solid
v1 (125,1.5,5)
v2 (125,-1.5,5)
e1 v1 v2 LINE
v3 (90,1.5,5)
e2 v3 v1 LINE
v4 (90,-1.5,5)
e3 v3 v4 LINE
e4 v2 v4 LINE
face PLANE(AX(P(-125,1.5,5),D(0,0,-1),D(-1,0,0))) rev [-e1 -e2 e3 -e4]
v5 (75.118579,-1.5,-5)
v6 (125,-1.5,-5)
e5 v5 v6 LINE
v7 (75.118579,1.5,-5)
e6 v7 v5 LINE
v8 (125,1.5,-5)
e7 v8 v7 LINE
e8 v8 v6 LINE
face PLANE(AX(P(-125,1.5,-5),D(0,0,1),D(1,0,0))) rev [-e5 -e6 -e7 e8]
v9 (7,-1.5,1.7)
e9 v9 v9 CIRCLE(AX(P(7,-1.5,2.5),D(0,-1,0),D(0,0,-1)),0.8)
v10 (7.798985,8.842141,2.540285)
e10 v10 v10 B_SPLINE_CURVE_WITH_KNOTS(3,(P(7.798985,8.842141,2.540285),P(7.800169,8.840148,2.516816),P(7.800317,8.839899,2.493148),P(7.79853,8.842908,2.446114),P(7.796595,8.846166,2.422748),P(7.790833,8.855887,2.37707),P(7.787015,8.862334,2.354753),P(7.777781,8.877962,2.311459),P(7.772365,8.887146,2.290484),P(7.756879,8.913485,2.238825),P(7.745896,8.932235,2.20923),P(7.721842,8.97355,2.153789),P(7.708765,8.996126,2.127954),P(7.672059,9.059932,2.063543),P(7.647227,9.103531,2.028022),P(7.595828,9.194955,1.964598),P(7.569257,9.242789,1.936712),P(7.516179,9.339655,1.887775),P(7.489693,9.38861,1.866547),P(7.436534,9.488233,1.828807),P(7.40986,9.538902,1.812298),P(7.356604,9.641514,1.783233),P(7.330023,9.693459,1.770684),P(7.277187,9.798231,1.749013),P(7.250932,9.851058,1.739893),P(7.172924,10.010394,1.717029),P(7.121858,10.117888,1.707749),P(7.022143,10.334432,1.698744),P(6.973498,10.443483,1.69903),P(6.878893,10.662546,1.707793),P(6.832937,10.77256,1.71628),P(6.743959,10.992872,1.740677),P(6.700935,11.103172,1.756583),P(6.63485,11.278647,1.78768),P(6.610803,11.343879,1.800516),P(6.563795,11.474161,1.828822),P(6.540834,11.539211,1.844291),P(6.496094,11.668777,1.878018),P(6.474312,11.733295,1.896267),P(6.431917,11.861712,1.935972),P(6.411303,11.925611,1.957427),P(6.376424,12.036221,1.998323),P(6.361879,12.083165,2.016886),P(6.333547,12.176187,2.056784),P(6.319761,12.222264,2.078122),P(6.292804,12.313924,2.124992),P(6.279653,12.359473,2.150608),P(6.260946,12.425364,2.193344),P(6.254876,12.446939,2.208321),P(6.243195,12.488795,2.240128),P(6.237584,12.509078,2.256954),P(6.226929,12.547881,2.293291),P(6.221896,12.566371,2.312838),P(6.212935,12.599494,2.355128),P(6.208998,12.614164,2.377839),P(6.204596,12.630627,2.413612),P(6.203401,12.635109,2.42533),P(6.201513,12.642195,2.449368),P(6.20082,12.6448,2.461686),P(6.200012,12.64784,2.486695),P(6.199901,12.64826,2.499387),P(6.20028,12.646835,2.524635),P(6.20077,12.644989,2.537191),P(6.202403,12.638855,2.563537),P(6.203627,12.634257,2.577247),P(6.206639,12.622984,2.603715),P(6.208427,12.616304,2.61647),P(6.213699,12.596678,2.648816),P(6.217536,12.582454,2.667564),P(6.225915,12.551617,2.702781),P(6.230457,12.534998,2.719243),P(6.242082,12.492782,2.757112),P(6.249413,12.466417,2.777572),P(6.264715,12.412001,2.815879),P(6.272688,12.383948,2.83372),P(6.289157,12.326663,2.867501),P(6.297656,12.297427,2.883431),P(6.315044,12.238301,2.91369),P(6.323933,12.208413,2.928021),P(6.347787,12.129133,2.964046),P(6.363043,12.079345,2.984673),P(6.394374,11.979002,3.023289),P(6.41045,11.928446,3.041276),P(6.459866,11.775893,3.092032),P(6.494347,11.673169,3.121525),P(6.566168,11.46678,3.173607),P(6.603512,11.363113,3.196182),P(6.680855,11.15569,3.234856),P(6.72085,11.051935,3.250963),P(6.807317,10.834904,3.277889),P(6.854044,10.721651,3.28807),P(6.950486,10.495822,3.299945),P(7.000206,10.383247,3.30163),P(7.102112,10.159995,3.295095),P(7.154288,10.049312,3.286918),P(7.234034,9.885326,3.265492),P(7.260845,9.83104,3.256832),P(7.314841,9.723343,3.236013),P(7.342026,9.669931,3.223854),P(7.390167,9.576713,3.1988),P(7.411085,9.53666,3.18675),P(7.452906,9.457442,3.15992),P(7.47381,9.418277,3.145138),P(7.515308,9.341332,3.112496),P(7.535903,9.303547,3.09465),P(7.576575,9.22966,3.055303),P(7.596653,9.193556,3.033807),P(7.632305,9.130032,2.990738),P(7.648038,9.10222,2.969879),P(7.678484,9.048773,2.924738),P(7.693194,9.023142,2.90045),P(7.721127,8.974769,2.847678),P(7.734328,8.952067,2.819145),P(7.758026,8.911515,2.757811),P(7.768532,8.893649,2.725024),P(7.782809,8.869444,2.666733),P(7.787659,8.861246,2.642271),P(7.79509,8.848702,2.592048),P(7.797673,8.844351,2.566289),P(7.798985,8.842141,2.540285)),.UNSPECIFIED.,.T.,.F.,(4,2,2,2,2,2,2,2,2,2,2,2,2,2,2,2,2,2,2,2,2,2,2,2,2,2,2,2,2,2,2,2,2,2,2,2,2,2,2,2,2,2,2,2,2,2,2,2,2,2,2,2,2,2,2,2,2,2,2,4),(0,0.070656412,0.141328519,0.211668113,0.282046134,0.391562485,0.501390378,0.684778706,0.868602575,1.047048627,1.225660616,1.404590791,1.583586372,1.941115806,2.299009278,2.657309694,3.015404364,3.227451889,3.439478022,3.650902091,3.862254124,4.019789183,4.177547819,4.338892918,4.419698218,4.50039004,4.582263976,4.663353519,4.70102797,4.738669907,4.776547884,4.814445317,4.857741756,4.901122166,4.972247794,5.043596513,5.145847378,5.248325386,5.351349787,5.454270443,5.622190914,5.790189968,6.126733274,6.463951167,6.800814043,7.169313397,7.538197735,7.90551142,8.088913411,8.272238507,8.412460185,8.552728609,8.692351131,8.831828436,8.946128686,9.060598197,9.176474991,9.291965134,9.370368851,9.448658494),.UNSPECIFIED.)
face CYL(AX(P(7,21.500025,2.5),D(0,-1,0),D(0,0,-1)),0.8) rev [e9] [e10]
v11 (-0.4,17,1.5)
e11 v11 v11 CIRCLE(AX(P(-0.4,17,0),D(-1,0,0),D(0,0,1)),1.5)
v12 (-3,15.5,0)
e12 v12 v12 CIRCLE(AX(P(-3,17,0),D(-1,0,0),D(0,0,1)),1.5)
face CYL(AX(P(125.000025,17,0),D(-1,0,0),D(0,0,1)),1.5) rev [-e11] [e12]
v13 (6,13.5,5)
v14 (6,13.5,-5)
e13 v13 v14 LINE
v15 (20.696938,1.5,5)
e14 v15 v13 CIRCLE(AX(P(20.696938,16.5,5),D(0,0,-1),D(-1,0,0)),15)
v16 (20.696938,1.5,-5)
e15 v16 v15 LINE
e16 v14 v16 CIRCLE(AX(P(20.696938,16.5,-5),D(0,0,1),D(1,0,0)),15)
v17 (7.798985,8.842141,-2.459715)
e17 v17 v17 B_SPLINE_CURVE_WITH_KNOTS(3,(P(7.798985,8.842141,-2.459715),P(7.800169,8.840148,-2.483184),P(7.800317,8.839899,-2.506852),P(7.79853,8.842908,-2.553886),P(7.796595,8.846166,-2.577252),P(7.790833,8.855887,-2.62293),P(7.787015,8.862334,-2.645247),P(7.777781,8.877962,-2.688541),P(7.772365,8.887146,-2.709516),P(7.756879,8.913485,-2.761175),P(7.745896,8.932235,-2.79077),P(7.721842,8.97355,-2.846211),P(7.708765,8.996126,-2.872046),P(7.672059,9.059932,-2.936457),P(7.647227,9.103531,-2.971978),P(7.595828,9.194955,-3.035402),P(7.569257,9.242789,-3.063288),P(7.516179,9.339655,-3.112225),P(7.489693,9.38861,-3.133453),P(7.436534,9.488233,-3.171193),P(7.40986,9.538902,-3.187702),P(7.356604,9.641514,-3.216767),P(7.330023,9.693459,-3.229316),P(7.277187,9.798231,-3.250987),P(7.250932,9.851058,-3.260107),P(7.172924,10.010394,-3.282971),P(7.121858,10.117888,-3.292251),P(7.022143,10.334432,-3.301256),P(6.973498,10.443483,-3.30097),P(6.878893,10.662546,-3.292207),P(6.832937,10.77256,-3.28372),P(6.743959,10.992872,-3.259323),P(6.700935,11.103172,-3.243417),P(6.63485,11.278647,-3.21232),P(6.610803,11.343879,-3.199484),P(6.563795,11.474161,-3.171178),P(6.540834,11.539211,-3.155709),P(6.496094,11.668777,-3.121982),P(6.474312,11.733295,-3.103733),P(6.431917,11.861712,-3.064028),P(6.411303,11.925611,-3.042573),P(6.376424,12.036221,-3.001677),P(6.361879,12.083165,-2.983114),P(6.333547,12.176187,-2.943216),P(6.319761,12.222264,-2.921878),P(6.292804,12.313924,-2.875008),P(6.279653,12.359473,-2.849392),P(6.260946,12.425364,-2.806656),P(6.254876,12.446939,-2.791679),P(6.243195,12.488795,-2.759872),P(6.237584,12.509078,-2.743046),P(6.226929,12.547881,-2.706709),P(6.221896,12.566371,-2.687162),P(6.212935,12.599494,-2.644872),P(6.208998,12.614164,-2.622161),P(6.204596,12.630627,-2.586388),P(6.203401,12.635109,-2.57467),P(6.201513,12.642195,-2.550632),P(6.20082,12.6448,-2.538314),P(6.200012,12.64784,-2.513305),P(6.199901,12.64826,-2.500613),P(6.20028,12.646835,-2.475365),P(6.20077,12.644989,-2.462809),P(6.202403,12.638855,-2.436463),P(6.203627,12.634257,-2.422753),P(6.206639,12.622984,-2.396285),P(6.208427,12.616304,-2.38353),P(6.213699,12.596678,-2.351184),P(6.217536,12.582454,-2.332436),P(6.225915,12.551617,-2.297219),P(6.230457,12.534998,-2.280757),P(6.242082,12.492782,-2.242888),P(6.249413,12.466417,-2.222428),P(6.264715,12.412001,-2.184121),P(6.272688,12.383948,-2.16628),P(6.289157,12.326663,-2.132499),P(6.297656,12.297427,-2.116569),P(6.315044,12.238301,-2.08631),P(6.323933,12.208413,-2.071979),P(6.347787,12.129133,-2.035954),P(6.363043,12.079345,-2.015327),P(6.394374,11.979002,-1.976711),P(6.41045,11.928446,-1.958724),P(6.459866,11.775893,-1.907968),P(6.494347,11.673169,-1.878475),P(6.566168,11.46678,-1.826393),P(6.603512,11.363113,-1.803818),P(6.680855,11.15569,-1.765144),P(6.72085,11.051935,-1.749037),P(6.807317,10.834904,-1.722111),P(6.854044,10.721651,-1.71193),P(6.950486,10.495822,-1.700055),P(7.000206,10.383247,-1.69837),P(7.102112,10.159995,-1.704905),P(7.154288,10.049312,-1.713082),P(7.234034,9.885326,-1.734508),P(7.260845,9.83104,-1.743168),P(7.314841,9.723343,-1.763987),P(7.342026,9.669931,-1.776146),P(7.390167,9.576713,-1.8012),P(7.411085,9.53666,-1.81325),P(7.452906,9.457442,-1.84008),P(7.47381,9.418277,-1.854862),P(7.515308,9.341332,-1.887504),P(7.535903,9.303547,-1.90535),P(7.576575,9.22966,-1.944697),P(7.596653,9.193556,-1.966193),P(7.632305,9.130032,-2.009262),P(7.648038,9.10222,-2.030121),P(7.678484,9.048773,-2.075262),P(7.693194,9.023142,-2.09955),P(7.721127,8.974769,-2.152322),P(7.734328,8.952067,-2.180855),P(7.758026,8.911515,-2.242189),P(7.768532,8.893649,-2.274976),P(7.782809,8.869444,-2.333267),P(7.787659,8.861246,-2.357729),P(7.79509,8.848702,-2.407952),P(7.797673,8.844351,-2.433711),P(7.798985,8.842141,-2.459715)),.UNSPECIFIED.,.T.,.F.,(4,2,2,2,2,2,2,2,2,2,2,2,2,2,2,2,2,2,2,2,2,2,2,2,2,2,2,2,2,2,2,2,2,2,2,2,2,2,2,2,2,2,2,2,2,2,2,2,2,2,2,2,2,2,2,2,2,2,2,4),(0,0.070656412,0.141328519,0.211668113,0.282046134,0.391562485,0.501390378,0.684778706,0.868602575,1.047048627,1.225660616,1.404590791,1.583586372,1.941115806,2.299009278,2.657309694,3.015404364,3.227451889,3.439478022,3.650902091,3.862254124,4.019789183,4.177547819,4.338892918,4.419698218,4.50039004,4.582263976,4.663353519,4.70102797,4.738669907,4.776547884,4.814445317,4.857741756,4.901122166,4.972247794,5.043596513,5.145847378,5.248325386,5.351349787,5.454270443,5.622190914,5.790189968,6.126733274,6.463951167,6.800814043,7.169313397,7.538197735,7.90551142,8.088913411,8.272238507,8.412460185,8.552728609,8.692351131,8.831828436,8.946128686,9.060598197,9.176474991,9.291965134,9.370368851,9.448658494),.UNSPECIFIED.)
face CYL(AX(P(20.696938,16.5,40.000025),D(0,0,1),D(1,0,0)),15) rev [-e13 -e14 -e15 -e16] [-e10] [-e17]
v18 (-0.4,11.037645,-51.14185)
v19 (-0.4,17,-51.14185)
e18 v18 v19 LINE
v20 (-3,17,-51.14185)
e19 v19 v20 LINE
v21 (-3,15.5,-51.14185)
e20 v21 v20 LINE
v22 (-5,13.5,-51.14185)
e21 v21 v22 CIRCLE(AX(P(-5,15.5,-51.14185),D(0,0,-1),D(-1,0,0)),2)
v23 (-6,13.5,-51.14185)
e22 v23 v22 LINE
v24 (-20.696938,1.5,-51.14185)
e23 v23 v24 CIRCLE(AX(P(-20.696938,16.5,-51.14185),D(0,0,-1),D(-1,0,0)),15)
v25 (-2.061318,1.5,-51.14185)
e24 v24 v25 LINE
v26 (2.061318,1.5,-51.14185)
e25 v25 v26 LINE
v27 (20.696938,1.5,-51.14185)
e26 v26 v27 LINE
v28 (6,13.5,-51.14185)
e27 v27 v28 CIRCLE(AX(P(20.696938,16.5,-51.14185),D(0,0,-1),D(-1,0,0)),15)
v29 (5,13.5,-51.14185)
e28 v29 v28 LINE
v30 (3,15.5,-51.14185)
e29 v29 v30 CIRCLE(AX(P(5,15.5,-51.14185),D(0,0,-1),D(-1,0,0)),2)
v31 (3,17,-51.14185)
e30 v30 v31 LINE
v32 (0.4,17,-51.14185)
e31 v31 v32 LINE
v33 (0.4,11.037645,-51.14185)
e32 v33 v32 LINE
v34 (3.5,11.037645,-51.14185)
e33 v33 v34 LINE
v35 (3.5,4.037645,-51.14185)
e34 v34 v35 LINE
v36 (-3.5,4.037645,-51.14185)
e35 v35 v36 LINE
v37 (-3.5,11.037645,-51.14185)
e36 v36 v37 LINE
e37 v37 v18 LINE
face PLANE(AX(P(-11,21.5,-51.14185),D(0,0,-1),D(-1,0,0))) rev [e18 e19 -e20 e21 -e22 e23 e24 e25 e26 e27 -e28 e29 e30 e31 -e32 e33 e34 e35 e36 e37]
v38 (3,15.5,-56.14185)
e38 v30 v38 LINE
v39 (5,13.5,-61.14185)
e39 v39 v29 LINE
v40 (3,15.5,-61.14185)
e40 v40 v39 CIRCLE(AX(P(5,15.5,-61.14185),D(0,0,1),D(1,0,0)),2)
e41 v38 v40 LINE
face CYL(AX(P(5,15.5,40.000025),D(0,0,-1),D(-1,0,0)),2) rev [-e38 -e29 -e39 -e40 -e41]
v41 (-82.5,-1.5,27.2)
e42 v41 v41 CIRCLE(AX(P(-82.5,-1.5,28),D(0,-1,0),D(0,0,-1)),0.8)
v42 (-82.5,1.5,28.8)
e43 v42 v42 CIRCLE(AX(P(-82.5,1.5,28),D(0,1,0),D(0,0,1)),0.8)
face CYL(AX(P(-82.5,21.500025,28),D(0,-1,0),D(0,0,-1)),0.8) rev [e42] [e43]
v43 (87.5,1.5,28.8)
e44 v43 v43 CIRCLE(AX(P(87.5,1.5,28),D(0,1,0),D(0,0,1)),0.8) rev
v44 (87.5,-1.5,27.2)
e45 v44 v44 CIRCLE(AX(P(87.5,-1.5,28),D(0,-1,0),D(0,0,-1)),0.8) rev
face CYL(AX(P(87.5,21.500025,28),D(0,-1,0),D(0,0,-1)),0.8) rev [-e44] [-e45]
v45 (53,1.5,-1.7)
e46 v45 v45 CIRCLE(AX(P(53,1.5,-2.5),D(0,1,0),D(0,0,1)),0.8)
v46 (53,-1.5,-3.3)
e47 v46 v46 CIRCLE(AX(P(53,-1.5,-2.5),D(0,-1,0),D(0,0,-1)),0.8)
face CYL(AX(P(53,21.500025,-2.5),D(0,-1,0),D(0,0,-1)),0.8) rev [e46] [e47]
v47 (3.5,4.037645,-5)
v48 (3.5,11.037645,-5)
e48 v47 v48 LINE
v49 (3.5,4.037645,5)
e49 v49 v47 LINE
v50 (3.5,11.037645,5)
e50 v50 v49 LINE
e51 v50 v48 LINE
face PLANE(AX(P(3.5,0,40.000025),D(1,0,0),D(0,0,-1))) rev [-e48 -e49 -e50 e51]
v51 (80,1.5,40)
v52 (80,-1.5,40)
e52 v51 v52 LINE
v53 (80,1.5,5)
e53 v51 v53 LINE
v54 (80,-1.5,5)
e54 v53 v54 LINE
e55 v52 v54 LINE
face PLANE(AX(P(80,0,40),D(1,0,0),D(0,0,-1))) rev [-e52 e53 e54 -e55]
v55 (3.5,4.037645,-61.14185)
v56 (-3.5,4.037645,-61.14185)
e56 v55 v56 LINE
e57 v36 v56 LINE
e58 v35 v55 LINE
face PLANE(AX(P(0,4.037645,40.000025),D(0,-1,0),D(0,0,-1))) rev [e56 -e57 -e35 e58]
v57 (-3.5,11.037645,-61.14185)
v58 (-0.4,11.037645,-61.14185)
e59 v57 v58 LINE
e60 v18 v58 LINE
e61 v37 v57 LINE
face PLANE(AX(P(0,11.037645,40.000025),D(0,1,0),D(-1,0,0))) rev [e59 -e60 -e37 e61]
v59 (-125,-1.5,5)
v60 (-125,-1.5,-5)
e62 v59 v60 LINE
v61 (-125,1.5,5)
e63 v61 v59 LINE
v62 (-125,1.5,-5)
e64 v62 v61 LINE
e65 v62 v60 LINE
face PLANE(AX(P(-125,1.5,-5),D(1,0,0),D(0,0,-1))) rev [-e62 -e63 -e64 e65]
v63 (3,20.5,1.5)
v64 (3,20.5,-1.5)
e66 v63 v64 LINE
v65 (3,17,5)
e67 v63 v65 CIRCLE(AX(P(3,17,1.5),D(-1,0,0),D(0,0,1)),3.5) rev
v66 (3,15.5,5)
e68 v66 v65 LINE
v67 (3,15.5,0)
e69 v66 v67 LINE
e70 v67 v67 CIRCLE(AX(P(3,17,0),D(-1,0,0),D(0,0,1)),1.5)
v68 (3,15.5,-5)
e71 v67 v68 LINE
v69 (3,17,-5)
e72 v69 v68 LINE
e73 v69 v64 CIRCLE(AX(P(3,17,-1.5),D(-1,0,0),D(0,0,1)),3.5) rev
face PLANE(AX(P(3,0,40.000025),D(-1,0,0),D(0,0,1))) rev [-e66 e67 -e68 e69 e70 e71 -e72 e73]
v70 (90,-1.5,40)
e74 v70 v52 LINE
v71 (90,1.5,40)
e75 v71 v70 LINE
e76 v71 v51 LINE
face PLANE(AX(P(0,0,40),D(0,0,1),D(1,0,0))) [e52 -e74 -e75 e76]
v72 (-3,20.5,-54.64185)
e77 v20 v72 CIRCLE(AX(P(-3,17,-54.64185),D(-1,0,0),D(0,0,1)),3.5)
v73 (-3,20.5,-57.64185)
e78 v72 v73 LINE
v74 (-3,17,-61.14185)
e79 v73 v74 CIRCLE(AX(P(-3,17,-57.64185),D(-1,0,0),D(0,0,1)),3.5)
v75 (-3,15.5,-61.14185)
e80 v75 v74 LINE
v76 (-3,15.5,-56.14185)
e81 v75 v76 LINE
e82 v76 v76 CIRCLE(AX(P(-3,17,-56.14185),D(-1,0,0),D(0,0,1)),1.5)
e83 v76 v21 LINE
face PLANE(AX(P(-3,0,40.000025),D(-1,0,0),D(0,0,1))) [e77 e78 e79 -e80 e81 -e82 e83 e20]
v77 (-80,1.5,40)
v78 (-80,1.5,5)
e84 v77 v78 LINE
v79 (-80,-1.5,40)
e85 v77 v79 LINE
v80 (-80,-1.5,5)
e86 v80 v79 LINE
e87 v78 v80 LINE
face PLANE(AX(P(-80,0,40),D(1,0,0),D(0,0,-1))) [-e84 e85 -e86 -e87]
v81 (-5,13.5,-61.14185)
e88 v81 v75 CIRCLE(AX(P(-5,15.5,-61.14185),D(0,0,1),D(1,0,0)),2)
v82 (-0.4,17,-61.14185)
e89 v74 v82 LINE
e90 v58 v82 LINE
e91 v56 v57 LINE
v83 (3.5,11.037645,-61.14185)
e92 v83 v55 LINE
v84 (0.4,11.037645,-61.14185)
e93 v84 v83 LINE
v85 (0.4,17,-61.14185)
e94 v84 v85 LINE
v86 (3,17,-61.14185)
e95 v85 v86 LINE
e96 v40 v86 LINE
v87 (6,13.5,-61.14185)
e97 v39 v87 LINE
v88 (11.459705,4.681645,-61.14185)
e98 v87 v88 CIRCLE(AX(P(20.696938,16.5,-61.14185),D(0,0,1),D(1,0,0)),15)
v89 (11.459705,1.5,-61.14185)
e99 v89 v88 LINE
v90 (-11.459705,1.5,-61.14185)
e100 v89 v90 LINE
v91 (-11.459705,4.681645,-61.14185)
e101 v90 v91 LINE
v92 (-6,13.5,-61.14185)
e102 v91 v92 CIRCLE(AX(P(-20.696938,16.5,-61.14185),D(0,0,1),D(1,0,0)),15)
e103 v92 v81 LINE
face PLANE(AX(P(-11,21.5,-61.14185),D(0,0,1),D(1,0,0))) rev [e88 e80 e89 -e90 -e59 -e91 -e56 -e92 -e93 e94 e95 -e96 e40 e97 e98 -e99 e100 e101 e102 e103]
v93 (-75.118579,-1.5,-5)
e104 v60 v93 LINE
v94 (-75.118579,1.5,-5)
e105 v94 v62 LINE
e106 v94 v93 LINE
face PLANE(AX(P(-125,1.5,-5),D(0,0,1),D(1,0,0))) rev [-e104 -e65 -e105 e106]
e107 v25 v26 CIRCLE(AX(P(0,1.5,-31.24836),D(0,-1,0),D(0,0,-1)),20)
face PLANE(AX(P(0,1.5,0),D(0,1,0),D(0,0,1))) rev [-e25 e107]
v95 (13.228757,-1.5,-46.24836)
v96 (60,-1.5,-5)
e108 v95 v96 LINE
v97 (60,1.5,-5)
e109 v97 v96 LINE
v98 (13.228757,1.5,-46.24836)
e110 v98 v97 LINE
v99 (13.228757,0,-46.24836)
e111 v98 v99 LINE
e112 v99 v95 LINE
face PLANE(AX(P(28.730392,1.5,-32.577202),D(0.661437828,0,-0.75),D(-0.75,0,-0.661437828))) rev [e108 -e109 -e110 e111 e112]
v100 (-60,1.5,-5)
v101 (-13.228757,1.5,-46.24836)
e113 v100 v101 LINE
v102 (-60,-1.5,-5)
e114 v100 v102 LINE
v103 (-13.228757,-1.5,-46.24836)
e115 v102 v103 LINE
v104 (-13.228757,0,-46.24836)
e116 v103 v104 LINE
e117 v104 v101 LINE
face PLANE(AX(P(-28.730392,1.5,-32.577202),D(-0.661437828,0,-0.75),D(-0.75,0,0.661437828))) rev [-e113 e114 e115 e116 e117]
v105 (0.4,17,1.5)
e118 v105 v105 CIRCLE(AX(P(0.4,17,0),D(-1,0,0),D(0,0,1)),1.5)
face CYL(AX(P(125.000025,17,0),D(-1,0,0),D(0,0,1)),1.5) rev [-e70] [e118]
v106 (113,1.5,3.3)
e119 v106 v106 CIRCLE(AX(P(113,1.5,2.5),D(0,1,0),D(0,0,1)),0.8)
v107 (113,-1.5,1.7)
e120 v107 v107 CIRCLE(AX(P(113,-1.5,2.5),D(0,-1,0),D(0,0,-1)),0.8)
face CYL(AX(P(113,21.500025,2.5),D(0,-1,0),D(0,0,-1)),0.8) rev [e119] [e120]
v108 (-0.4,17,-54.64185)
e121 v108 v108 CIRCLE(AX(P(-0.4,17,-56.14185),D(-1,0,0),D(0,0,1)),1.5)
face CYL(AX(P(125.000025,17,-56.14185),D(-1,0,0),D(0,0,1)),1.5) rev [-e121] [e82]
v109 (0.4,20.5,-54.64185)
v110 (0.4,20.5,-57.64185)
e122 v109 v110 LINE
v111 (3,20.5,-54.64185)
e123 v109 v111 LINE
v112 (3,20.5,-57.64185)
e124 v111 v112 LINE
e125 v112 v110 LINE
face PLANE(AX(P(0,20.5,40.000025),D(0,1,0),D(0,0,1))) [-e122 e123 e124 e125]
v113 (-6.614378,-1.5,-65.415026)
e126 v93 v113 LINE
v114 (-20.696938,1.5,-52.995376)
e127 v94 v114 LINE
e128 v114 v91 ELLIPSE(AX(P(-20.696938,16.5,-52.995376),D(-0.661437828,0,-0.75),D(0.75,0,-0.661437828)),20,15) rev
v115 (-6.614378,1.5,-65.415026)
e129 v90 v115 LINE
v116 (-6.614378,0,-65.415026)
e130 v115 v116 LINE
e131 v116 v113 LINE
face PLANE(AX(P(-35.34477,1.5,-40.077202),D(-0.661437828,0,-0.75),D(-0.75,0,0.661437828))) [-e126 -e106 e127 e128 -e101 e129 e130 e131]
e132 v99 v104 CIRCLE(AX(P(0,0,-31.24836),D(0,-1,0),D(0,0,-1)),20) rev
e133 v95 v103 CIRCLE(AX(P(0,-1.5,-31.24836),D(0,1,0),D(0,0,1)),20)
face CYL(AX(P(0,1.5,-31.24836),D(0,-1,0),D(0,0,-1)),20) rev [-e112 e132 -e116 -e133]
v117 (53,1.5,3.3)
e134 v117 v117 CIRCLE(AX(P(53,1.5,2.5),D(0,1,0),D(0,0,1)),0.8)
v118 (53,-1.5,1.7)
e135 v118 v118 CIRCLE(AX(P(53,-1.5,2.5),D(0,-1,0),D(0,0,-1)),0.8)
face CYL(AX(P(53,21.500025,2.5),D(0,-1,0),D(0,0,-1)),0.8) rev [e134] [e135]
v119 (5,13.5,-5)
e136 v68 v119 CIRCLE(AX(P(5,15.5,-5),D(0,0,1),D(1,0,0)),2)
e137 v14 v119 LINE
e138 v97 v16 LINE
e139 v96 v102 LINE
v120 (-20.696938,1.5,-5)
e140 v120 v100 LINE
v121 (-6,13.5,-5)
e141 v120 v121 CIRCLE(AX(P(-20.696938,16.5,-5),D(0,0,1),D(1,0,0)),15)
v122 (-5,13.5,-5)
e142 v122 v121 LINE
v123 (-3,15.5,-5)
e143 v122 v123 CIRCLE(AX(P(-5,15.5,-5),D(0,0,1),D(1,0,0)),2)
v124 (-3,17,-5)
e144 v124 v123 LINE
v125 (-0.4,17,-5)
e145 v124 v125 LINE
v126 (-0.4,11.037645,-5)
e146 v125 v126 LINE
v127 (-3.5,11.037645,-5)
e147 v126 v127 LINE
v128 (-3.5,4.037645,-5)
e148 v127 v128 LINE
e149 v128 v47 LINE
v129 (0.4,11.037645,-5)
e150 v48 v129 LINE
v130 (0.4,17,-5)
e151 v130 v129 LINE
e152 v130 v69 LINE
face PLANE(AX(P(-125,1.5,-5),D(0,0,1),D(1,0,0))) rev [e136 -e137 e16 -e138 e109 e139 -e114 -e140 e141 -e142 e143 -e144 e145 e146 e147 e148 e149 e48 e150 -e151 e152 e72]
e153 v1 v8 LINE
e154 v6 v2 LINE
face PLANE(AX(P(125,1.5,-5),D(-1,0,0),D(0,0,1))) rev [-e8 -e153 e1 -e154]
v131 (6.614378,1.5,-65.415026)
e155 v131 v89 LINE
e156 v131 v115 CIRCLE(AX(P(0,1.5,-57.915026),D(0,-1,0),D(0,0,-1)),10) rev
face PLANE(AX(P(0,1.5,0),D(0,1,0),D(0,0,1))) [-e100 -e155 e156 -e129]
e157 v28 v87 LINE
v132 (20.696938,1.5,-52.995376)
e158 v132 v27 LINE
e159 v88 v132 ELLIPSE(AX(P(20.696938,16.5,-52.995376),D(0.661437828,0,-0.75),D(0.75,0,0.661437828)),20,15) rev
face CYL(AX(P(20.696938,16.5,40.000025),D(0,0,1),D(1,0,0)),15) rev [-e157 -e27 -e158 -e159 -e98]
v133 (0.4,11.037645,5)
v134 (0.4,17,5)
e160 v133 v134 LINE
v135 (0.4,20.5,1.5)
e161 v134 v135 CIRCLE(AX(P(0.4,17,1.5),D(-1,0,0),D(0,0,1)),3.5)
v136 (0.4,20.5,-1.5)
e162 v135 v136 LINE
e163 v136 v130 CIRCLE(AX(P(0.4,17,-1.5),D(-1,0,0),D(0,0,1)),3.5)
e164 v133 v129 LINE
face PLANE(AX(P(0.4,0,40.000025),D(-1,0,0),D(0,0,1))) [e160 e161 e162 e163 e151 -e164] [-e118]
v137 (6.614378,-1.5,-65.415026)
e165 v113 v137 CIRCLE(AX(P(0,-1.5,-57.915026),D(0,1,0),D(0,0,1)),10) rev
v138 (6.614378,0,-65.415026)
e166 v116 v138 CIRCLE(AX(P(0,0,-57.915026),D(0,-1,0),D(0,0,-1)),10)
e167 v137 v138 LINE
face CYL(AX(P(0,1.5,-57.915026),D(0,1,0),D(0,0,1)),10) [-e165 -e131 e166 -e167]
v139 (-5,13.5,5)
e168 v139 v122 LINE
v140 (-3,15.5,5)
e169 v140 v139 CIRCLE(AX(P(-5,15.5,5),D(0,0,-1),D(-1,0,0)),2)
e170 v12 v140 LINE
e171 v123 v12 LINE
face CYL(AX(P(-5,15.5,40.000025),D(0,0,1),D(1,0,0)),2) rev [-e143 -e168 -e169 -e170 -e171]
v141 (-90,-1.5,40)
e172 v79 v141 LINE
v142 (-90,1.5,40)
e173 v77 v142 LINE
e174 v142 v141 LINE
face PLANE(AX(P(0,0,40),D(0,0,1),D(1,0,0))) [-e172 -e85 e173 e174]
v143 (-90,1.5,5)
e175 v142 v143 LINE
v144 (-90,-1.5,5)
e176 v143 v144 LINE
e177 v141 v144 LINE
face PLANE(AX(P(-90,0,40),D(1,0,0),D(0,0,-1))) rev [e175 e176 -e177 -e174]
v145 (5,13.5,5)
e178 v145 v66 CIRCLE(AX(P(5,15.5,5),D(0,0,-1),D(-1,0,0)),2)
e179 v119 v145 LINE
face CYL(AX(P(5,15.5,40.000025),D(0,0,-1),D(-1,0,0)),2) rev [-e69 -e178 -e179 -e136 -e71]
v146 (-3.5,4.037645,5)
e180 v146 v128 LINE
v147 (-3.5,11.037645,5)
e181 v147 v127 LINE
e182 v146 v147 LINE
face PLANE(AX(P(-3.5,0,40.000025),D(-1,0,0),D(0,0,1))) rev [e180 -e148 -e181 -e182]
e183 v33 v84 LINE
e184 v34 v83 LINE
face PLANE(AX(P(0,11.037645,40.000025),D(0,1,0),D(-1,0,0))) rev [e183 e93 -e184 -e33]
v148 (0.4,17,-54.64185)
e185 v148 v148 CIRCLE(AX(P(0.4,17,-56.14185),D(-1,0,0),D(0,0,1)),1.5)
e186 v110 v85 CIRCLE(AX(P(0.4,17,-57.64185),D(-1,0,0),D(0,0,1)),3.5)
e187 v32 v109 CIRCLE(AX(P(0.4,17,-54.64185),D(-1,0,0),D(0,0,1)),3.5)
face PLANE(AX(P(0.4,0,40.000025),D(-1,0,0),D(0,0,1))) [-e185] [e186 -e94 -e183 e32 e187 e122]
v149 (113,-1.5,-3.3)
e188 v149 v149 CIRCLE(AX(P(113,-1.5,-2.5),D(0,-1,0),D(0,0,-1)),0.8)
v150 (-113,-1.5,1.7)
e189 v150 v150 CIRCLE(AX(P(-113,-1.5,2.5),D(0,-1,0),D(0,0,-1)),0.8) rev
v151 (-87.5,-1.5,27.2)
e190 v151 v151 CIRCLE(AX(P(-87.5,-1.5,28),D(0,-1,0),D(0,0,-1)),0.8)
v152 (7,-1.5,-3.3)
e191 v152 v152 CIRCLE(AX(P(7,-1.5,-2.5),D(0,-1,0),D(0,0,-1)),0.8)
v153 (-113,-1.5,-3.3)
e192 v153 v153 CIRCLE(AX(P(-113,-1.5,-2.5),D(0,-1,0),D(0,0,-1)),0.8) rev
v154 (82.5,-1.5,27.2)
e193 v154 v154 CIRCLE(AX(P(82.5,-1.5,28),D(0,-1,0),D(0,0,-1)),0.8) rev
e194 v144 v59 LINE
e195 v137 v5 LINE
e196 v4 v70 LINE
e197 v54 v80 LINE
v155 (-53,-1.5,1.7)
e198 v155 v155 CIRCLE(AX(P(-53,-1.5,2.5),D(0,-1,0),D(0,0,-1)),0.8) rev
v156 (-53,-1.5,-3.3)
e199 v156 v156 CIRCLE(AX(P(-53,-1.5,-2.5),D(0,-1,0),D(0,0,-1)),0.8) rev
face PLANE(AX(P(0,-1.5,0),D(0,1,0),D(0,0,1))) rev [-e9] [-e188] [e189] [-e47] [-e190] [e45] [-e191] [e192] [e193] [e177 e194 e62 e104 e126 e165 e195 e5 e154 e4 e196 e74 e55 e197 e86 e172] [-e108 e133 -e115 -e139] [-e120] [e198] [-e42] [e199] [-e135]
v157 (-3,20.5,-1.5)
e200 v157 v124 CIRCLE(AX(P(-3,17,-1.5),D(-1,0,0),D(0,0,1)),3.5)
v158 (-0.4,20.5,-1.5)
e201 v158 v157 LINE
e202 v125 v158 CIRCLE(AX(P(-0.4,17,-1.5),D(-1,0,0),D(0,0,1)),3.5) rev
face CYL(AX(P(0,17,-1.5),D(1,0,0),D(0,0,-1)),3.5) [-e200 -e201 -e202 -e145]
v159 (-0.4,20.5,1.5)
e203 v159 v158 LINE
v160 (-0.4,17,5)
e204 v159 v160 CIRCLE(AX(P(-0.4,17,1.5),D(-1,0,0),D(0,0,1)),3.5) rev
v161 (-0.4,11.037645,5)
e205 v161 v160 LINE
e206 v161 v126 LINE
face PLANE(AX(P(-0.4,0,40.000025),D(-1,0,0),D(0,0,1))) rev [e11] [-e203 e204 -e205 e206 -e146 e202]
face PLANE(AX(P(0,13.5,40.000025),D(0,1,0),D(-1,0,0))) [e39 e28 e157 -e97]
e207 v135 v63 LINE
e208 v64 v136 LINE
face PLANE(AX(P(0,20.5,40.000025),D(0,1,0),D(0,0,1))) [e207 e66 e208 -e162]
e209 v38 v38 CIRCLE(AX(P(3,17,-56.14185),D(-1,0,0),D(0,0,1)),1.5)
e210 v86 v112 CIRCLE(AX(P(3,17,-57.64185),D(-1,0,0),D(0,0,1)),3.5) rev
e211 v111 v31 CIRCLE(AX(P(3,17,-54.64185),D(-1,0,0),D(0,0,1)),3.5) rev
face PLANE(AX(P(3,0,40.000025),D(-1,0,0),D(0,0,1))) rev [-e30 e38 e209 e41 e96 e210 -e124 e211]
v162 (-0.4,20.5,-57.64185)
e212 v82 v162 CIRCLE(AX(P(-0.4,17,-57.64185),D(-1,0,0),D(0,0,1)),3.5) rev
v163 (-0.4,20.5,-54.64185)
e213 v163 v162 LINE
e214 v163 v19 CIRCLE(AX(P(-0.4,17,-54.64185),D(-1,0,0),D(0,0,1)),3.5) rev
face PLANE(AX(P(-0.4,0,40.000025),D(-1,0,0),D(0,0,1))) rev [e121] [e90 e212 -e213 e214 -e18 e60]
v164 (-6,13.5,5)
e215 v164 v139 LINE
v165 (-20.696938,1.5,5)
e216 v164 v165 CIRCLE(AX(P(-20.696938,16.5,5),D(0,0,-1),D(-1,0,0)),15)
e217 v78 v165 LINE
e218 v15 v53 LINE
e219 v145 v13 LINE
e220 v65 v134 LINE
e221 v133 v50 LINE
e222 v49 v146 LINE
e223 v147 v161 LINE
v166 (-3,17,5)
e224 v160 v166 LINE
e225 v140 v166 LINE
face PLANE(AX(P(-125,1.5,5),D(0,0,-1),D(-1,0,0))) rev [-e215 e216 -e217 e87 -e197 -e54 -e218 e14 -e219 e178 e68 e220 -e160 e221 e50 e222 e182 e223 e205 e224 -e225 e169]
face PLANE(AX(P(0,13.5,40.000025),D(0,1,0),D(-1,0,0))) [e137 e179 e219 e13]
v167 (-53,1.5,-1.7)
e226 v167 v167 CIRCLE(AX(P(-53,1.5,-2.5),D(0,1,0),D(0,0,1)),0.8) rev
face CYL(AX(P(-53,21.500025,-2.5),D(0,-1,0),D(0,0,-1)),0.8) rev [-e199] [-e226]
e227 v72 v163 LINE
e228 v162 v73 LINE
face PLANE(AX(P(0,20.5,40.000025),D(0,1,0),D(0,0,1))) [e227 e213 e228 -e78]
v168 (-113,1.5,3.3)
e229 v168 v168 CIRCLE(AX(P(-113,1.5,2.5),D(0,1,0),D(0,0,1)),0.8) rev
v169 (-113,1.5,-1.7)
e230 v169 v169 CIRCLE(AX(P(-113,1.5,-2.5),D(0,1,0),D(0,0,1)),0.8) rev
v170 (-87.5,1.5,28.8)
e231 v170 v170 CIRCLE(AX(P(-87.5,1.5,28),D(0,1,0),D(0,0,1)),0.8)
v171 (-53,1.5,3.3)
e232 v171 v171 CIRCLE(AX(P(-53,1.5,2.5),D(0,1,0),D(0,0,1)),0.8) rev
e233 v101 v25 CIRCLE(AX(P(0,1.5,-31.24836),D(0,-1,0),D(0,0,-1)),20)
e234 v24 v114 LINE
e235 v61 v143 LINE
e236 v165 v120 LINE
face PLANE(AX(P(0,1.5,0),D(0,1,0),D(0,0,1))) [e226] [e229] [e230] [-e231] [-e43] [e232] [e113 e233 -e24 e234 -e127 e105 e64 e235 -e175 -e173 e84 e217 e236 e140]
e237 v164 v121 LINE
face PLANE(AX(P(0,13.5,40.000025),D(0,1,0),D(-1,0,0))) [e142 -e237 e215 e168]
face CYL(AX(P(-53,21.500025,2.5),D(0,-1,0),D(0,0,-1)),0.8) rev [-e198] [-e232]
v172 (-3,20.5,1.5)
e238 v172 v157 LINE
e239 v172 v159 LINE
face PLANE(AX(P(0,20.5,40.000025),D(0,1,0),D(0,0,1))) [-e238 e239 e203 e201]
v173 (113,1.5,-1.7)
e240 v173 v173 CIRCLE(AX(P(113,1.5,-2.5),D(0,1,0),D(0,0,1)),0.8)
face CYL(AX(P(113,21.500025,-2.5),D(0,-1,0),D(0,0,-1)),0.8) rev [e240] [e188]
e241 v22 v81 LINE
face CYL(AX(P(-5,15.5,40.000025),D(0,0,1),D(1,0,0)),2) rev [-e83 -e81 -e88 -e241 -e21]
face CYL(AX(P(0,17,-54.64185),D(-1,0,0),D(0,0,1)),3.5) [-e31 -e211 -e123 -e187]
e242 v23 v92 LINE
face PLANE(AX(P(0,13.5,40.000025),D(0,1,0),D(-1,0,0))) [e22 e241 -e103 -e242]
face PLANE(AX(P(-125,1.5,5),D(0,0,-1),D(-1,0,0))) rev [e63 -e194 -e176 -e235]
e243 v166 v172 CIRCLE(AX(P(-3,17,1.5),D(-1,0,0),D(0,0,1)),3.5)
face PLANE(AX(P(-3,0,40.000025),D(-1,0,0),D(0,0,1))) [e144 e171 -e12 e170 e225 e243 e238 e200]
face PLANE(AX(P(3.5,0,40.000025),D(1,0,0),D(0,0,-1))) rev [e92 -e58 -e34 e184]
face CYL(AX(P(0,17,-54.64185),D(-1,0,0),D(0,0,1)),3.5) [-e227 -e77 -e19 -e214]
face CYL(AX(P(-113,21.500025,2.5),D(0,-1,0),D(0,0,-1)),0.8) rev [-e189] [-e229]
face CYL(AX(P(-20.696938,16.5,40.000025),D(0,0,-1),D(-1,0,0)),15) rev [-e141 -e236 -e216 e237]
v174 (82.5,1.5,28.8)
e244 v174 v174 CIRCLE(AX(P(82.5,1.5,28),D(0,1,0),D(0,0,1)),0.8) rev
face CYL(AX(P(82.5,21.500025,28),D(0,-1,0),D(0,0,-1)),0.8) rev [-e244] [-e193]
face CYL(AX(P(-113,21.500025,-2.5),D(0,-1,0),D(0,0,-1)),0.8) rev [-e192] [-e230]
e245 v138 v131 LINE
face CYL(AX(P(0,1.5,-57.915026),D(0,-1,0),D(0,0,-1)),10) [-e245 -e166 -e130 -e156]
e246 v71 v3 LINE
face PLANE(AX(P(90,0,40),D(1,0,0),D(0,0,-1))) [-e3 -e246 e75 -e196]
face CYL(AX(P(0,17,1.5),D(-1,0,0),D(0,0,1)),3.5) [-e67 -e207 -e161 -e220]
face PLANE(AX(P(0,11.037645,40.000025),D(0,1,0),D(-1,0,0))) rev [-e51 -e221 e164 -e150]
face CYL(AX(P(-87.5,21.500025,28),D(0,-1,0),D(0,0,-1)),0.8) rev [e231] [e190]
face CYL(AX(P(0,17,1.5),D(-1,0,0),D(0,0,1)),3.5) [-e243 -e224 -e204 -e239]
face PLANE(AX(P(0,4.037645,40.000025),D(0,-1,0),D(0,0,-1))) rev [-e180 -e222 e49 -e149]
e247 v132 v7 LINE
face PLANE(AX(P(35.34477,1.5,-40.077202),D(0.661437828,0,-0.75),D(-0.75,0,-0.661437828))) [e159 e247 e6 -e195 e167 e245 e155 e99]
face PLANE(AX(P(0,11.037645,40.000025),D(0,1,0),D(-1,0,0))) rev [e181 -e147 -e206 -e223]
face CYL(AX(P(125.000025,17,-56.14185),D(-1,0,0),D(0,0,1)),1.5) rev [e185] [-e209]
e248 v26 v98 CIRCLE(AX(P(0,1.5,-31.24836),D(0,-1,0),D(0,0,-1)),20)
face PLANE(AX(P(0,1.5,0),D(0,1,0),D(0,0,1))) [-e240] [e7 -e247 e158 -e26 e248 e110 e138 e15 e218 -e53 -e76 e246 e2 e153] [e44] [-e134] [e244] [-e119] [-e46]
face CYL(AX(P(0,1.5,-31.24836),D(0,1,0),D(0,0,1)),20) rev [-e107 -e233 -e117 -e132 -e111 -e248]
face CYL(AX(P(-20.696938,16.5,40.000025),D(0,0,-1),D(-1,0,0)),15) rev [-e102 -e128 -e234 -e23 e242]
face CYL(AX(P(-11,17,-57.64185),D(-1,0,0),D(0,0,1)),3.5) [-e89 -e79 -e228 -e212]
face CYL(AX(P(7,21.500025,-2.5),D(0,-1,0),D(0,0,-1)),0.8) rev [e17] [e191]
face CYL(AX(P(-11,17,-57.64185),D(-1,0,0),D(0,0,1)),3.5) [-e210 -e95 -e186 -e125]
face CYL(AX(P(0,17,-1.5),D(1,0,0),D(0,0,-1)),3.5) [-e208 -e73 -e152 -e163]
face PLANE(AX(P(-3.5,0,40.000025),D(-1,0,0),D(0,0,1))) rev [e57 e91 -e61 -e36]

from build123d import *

# Parameters (mm, degrees)
EXTRUDE_1_DEPTH      = 1.5
EXTRUDE_10_DEPTH     = 1.5
FILLET_1_R           = 10
FILLET_2_R           = 20
EXTRUDE_11_DEPTH     = 20
EXTRUDE_13_DEPTH     = 35
EXTRUDE_14_DEPTH     = 35
EXTRUDE_15_DEPTH     = 1.5
FILLET_5_R           = 20
FILLET_6_R           = 10
SKETCH_58_R          = 0.8000000000000042
SKETCH_58_R_2        = 0.8000000000000055
SKETCH_58_R_3        = 0.8000000000000044
SKETCH_58_R_4        = 0.7999999999999963
SKETCH_58_R_5        = 0.8000000000000119
SKETCH_58_R_6        = 0.7999999999999946
SKETCH_58_R_7        = 0.7999999999999954
SKETCH_58_R_8        = 0.7999999999999948
SKETCH_58_R_9        = 0.8000000000000026
CUT_EXTRUDE_52_DEPTH = 145.10569310974057
SKETCH_26_W          = 22
SKETCH_26_H          = 10
EXTRUDE_16_DEPTH     = 20
CUT_EXTRUDE_53_DEPTH = 163.22491745731594
FILLET_7_R           = 15
FILLET_8_R           = 15
FILLET_9_R           = 3.5
SKETCH_60_R          = 1.5000000000000042
CUT_EXTRUDE_54_DEPTH = 147.3444593643323
SKETCH_61_R          = 1.5000000000000004
CUT_EXTRUDE_55_DEPTH = 147.3444593643323
FILLET_10_R          = 2


# Some blends are built 0.0001 mm under size
with BuildPart() as part:
    # 草图1 → 凸台-拉伸1 (new body)
    with BuildSketch(Plane(origin=(0, 0, 0), x_dir=(1, 0, 0), z_dir=(0, 1, 0))):
        Polygon((-125, 4.999999999999984), (124.99999999999996, 4.999999999999984), (124.99999999999996, -5.0000000000000115), (-125.00000000000003, -5.0000000000000115), align=None)
    extrude(amount=EXTRUDE_1_DEPTH)



with BuildPart() as body_2:
    # 草图22 → 凸台-拉伸10 (new body)
    with BuildSketch(Plane.XZ):
        Polygon((-3.09e-14, -71.24835955462486), (-3.362e-14, -57.91502622129154), (-60.00000000000021, -4.9999999999999805), (-75.11857892036937, -4.9999999999999805), align=None)
        Polygon((60.00000000000021, -4.9999999999999645), (1.388e-14, -57.91502622129154), (-3.09e-14, -71.24835955462486), (75.1185789203694, -4.999999999999957), align=None)
    extrude(amount=-EXTRUDE_10_DEPTH)

    # 圆角1
    fillet_1_edges = [body_2.edges().sort_by_distance(p)[0] for p in [
        (-8.35e-15, 0.75, -71.24835955462484),
    ]]
    fillet(fillet_1_edges, radius=FILLET_1_R)

    # 圆角2
    fillet_2_edges = [body_2.edges().sort_by_distance(p)[0] for p in [
        (-9.71e-15, 0.75, -57.91502622129154),
    ]]
    fillet(fillet_2_edges, radius=FILLET_2_R)


with BuildPart() as part_1:
    add(part.part)

    add(body_2.part)  # 凸台-拉伸11 merges body 2
    # 草图24 → 凸台-拉伸11 (add)
    with BuildSketch(Plane(origin=(0, 1.5, 0), x_dir=(1, 0, 0), z_dir=(0, 1, 0))):
        Polygon((-10.000000000000004, 4.999999999999999), (9.999999999999996, 4.999999999999999), (9.999999999999996, -5.000000000000001), (-10.000000000000002, -5.000000000000001), align=None)
    extrude(amount=EXTRUDE_11_DEPTH)

    # 草图41 → 凸台-拉伸13 (add)
    with BuildSketch(Plane.XY.offset(5.0000000000000115)):
        Polygon((89.99999999999996, 1.4999999999999951), (79.99999999999996, 1.4999999999999951), (79.99999999999996, -4.88e-15), (89.99999999999996, -4.99e-15), (89.99999999999996, 0.7499999999999958), align=None)
    extrude(amount=EXTRUDE_13_DEPTH)

    # 草图42 → 凸台-拉伸14 (add)
    with BuildSketch(Plane.XY.offset(5.0000000000000115)):
        Polygon((-80, 1.4999999999999998), (-90, 1.4999999999999998), (-90, 0.75), (-90, -2.2e-16), (-80, -2.2e-16), align=None)
    extrude(amount=EXTRUDE_14_DEPTH)

    # 草图57 → 凸台-拉伸15 (add)
    with BuildSketch(Plane(origin=(0, 0, 0), x_dir=(-1, 0, 0), z_dir=(0, -1, 0))):
        Polygon((125.00000000000003, -5.0000000000000115), (90, -5.0000000000000115), (90, -40.000000000000014), (80, -40.000000000000014), (80, -5.0000000000000115), (-79.99999999999996, -5.0000000000000115), (-79.99999999999996, -40.000000000000014), (-89.99999999999996, -40.000000000000014), (-89.99999999999994, -5.0000000000000115), (-124.99999999999996, -5.0000000000000115), (-124.99999999999996, 4.999999999999984), (-75.11857892036936, 4.999999999999984), (-6.614378277661482, 65.41502622129155), (-3.024e-14, 71.24835955462483), (6.614378277661415, 65.41502622129157), (75.11857892036936, 4.999999999999984), (125, 4.999999999999984), align=None)
        Polygon((60.00000000000022, 4.999999999999984), (-60.00000000000011, 4.999999999999984), (-2.082e-14, 57.915026221291534), align=None, mode=Mode.SUBTRACT)
    extrude(amount=EXTRUDE_15_DEPTH)

    # 圆角5
    fillet_5_edges = [part_1.edges().sort_by_distance(p)[0] for p in [
        (2.082e-14, -0.75, -57.915026221291534),
    ]]
    fillet(fillet_5_edges, radius=FILLET_5_R)

    # 圆角6
    fillet_6_edges = [part_1.edges().sort_by_distance(p)[0] for p in [
        (3.024e-14, -0.75, -71.24835955462483),
    ]]
    fillet(fillet_6_edges, radius=FILLET_6_R)

    # 草图58 → 切除-拉伸52 (cut, through all)
    with BuildSketch(Plane.XZ.offset(1.5)):
        with Locations(Location((7, 2.499999999999986, 0), (0, 0, 270))):
            Circle(SKETCH_58_R)
        with Locations(Location((6.999999999999998, -2.5000000000000147, 0), (0, 0, 270))):
            Circle(SKETCH_58_R_2)
        with Locations(Location((53, 2.5000000000000027, 0), (0, 0, 270))):
            Circle(SKETCH_58_R_3)
        with Locations(Location((53.000000000000014, -2.5000000000000027, 0), (0, 0, 270))):
            Circle(SKETCH_58_R_4)
        with Locations(Location((112.99999999999994, 2.5000000000000138, 0), (0, 0, 270))):
            Circle(SKETCH_58_R_5)
        with Locations(Location((112.99999999999997, -2.500000000000007, 0), (0, 0, 270))):
            Circle(SKETCH_58_R_6)
        with Locations(Location((-87.5, 28.000000000000014, 0), (0, 0, 270))):
            Circle(SKETCH_58_R_7)
        with Locations(Location((-82.49999999999999, 28.000000000000007, 0), (0, 0, 270))):
            Circle(SKETCH_58_R_8)
        with Locations(Location((-112.99999999999996, -2.5, 0), (0, 0, 270))):
            Circle(SKETCH_58_R_7)
        with Locations(Location((-112.99999999999996, 2.4999999999999987, 0), (0, 0, 270))):
            Circle(SKETCH_58_R_7)
        with Locations(Location((-53, -2.5, 0), (0, 0, 270))):
            Circle(SKETCH_58_R_9)
        with Locations(Location((-53, 2.5, 0), (0, 0, 270))):
            Circle(SKETCH_58_R_9)
        with Locations(Location((82.49999999999999, 28.000000000000036, 0), (0, 0, 270))):
            Circle(SKETCH_58_R_7)
        with Locations(Location((87.5, 28.000000000000036, 0), (0, 0, 270))):
            Circle(SKETCH_58_R_7)
    extrude(amount=-CUT_EXTRUDE_52_DEPTH, mode=Mode.SUBTRACT)

    # 草图26 → 凸台-拉伸16 (add)
    with BuildSketch(Plane(origin=(0, 1.5, 0), x_dir=(1, 0, 0), z_dir=(0, 1, 0))):
        with Locations((-1.78e-15, 56.141850111775966)):
            Rectangle(SKETCH_26_W, SKETCH_26_H)
    extrude(amount=EXTRUDE_16_DEPTH)

    # 草图59 → 切除-拉伸53 (cut, through all)
    with BuildSketch(Plane(origin=(1.928e-14, 0, -61.14185011177596), x_dir=(-1, 0, -3.2e-16), z_dir=(3.2e-16, 0, -1))):
        Polygon((5.999999999999998, 13.5), (5.999999999999998, 1.5), (11.000000000000021, 1.5), (11.00000000000002, 21.5), (-10.99999999999998, 21.5), (-10.999999999999979, 1.5), (-6, 1.5), (-6.000000000000002, 13.499999999999996), (-3.0000000000000018, 13.499999999999996), (-3.0000000000000018, 20.499999999999996), (-0.40000000000000174, 20.499999999999996), (-1.73e-15, 20.499999999999996), (0.3999999999999983, 20.499999999999996), (2.9999999999999982, 20.499999999999996), (2.9999999999999982, 13.499999999999996), align=None)
        Polygon((-3.5000000000000013, 4.037645071572423), (-1.78e-15, 4.037645071572423), (3.4999999999999982, 4.037645071572423), (3.4999999999999982, 11.037645071572424), (0.927810105733712, 11.037645071572424), (0.3999999999999977, 11.037645071572424), (-1.78e-15, 11.037645071572424), (-0.4000000000000017, 11.037645071572422), (-3.5000000000000018, 11.037645071572422), align=None)
        Polygon((-0.4000000000000018, 13.499999999999996), (-0.4000000000000018, 11.037645071572424), (-1.78e-15, 11.037645071572424), (0.3999999999999977, 11.037645071572424), (0.3999999999999976, 13.499999999999996), (-1.78e-15, 13.499999999999998), align=None)
        Polygon((-0.40000000000000174, 20.499999999999996), (-0.4000000000000018, 13.499999999999996), (-1.78e-15, 13.499999999999998), (-1.73e-15, 20.499999999999996), align=None)
        Polygon((-1.78e-15, 13.499999999999998), (0.3999999999999977, 13.499999999999998), (0.3999999999999983, 20.499999999999996), (-1.73e-15, 20.499999999999996), align=None)
    extrude(amount=-CUT_EXTRUDE_53_DEPTH, mode=Mode.SUBTRACT)

    # 圆角7
    # the kernel refuses this fillet: 15 mm, written as the material it adds along each edge
    with BuildSketch(Plane(origin=(6.0000000000000195, 1.5, -61.14185011177596), x_dir=(1, 0, 3.2e-16), z_dir=(-3.2e-16, 0, 1))) as fillet_7_piece_1_section:
        with BuildLine():
            CenterArc((14.696938456699067, 15), FILLET_7_R, 191.5369590328155, 78.4630409671845)
            Line((1.78e-15, 11.999999999999996), (0, 0))
            Line((0, 0), (14.696938456699067, 0))
        make_face()
    fillet_7_piece_1 = extrude(amount=9.999999999999993, mode=Mode.PRIVATE)
    fillet_7_piece_1 = split(fillet_7_piece_1, bisect_by=Plane(origin=(8.388620739132056, 1.5, -63.85029144843083), z_dir=(-0.6614378277661448, 0, 0.7500000000000027)), keep=Keep.TOP, mode=Mode.PRIVATE)
    add(fillet_7_piece_1)
    with BuildSketch(Plane(origin=(-5.99999999999998, 1.5, -61.14185011177596), x_dir=(-1, 0, -3.2e-16), z_dir=(-3.2e-16, 0, 1))) as fillet_7_piece_2_section:
        with BuildLine():
            CenterArc((14.696938456699073, -15), FILLET_7_R, 90, 78.46304096718453)
            Line((8.9e-16, -12), (0, 0))
            Line((0, 0), (14.696938456699073, 0))
        make_face()
    fillet_7_piece_2 = extrude(amount=9.999999999999993, mode=Mode.PRIVATE)
    fillet_7_piece_2 = split(fillet_7_piece_2, bisect_by=Plane(origin=(-8.388620739132019, 1.5, -63.85029144843084), z_dir=(0.6614378277661446, 0, 0.7500000000000028)), keep=Keep.TOP, mode=Mode.PRIVATE)
    add(fillet_7_piece_2)

    # 圆角8
    # the kernel refuses this fillet: 15 mm, written as the material it adds along each edge
    with BuildSketch(Plane(origin=(6.000000000000002, 1.5, -4.999999999999986), x_dir=(1, 0, 3.2e-16), z_dir=(-3.2e-16, 0, 1))) as fillet_8_piece_1_section:
        with BuildLine():
            CenterArc((14.69693845669907, 15), FILLET_8_R, 191.5369590328155, 78.4630409671845)
            Line((1.78e-15, 11.999999999999996), (0, 0))
            Line((0, 0), (14.69693845669907, 0))
        make_face()
    fillet_8_piece_1 = extrude(amount=9.999999999999993, mode=Mode.PRIVATE)
    fillet_8_piece_1 = fillet_8_piece_1 - Plane(origin=(6.999999999999998, 1.5, -2.5000000000000147), x_dir=(-1.8e-16, 0, -1), z_dir=(0, -1, 0)) * Cylinder(0.8000000000000055, 79, mode=Mode.PRIVATE)
    fillet_8_piece_1 = fillet_8_piece_1 - Plane(origin=(7, 1.5, 2.499999999999986), x_dir=(-1.8e-16, 0, -1), z_dir=(0, -1, 0)) * Cylinder(0.8000000000000042, 79, mode=Mode.PRIVATE)
    add(fillet_8_piece_1)
    with BuildSketch(Plane(origin=(-5.999999999999997, 1.5, -4.999999999999986), x_dir=(-1, 0, -3.2e-16), z_dir=(-3.2e-16, 0, 1))) as fillet_8_piece_2:
        with BuildLine():
            CenterArc((14.696938456699069, -15), FILLET_8_R, 90, 78.4630409671845)
            Line((8.9e-16, -12), (0, 0))
            Line((0, 0), (14.696938456699069, 0))
        make_face()
    extrude(amount=9.999999999999993)

    # 圆角9
    fillet_9_edges = [part_1.edges().sort_by_distance(p)[0] for p in [
        (-1.6999999999999824, 20.499999999999996, -51.141850111775966),
        (1.700000000000018, 20.499999999999996, -51.141850111775966),
        (1.7000000000000028, 20.499999999999996, 5.000000000000009),
        (1.700000000000021, 20.499999999999996, -61.14185011177596),
        (-1.7000000000000028, 20.499999999999996, 5.000000000000009),
        (-1.699999999999979, 20.499999999999996, -61.14185011177596),
        (1.70000000000001, 20.499999999999996, -4.999999999999985),
        (-1.6999999999999957, 20.499999999999996, -4.999999999999985),
    ]]
    fillet(fillet_9_edges, radius=FILLET_9_R)

    # 草图60 → 切除-拉伸54 (cut, through all)
    with BuildSketch(Plane.ZY.offset(2.9999999999999987)):
        with Locations((-56.14185011177597, 16.999999999999996)):
            Circle(SKETCH_60_R)
    extrude(amount=-CUT_EXTRUDE_54_DEPTH, mode=Mode.SUBTRACT)

    # 草图61 → 切除-拉伸55 (cut, through all)
    with BuildSketch(Plane.ZY.offset(2.9999999999999987)):
        with Locations((4.3e-16, 16.999999999999996)):
            Circle(SKETCH_61_R)
    extrude(amount=-CUT_EXTRUDE_55_DEPTH, mode=Mode.SUBTRACT)

    # 圆角10
    fillet_10_edges = [part_1.edges().sort_by_distance(p)[0] for p in [
        (3.0000000000000018, 13.499999999999996, 7.11e-15),
        (3.000000000000019, 13.499999999999996, -56.141850111775966),
        (-2.9999999999999982, 13.499999999999998, 7.11e-15),
        (-2.999999999999981, 13.499999999999998, -56.141850111775966),
    ]]
    fillet(fillet_10_edges, radius=FILLET_10_R - 0.0001)  # a hair under: the kernel refuses the full size


solid = part_1.part
